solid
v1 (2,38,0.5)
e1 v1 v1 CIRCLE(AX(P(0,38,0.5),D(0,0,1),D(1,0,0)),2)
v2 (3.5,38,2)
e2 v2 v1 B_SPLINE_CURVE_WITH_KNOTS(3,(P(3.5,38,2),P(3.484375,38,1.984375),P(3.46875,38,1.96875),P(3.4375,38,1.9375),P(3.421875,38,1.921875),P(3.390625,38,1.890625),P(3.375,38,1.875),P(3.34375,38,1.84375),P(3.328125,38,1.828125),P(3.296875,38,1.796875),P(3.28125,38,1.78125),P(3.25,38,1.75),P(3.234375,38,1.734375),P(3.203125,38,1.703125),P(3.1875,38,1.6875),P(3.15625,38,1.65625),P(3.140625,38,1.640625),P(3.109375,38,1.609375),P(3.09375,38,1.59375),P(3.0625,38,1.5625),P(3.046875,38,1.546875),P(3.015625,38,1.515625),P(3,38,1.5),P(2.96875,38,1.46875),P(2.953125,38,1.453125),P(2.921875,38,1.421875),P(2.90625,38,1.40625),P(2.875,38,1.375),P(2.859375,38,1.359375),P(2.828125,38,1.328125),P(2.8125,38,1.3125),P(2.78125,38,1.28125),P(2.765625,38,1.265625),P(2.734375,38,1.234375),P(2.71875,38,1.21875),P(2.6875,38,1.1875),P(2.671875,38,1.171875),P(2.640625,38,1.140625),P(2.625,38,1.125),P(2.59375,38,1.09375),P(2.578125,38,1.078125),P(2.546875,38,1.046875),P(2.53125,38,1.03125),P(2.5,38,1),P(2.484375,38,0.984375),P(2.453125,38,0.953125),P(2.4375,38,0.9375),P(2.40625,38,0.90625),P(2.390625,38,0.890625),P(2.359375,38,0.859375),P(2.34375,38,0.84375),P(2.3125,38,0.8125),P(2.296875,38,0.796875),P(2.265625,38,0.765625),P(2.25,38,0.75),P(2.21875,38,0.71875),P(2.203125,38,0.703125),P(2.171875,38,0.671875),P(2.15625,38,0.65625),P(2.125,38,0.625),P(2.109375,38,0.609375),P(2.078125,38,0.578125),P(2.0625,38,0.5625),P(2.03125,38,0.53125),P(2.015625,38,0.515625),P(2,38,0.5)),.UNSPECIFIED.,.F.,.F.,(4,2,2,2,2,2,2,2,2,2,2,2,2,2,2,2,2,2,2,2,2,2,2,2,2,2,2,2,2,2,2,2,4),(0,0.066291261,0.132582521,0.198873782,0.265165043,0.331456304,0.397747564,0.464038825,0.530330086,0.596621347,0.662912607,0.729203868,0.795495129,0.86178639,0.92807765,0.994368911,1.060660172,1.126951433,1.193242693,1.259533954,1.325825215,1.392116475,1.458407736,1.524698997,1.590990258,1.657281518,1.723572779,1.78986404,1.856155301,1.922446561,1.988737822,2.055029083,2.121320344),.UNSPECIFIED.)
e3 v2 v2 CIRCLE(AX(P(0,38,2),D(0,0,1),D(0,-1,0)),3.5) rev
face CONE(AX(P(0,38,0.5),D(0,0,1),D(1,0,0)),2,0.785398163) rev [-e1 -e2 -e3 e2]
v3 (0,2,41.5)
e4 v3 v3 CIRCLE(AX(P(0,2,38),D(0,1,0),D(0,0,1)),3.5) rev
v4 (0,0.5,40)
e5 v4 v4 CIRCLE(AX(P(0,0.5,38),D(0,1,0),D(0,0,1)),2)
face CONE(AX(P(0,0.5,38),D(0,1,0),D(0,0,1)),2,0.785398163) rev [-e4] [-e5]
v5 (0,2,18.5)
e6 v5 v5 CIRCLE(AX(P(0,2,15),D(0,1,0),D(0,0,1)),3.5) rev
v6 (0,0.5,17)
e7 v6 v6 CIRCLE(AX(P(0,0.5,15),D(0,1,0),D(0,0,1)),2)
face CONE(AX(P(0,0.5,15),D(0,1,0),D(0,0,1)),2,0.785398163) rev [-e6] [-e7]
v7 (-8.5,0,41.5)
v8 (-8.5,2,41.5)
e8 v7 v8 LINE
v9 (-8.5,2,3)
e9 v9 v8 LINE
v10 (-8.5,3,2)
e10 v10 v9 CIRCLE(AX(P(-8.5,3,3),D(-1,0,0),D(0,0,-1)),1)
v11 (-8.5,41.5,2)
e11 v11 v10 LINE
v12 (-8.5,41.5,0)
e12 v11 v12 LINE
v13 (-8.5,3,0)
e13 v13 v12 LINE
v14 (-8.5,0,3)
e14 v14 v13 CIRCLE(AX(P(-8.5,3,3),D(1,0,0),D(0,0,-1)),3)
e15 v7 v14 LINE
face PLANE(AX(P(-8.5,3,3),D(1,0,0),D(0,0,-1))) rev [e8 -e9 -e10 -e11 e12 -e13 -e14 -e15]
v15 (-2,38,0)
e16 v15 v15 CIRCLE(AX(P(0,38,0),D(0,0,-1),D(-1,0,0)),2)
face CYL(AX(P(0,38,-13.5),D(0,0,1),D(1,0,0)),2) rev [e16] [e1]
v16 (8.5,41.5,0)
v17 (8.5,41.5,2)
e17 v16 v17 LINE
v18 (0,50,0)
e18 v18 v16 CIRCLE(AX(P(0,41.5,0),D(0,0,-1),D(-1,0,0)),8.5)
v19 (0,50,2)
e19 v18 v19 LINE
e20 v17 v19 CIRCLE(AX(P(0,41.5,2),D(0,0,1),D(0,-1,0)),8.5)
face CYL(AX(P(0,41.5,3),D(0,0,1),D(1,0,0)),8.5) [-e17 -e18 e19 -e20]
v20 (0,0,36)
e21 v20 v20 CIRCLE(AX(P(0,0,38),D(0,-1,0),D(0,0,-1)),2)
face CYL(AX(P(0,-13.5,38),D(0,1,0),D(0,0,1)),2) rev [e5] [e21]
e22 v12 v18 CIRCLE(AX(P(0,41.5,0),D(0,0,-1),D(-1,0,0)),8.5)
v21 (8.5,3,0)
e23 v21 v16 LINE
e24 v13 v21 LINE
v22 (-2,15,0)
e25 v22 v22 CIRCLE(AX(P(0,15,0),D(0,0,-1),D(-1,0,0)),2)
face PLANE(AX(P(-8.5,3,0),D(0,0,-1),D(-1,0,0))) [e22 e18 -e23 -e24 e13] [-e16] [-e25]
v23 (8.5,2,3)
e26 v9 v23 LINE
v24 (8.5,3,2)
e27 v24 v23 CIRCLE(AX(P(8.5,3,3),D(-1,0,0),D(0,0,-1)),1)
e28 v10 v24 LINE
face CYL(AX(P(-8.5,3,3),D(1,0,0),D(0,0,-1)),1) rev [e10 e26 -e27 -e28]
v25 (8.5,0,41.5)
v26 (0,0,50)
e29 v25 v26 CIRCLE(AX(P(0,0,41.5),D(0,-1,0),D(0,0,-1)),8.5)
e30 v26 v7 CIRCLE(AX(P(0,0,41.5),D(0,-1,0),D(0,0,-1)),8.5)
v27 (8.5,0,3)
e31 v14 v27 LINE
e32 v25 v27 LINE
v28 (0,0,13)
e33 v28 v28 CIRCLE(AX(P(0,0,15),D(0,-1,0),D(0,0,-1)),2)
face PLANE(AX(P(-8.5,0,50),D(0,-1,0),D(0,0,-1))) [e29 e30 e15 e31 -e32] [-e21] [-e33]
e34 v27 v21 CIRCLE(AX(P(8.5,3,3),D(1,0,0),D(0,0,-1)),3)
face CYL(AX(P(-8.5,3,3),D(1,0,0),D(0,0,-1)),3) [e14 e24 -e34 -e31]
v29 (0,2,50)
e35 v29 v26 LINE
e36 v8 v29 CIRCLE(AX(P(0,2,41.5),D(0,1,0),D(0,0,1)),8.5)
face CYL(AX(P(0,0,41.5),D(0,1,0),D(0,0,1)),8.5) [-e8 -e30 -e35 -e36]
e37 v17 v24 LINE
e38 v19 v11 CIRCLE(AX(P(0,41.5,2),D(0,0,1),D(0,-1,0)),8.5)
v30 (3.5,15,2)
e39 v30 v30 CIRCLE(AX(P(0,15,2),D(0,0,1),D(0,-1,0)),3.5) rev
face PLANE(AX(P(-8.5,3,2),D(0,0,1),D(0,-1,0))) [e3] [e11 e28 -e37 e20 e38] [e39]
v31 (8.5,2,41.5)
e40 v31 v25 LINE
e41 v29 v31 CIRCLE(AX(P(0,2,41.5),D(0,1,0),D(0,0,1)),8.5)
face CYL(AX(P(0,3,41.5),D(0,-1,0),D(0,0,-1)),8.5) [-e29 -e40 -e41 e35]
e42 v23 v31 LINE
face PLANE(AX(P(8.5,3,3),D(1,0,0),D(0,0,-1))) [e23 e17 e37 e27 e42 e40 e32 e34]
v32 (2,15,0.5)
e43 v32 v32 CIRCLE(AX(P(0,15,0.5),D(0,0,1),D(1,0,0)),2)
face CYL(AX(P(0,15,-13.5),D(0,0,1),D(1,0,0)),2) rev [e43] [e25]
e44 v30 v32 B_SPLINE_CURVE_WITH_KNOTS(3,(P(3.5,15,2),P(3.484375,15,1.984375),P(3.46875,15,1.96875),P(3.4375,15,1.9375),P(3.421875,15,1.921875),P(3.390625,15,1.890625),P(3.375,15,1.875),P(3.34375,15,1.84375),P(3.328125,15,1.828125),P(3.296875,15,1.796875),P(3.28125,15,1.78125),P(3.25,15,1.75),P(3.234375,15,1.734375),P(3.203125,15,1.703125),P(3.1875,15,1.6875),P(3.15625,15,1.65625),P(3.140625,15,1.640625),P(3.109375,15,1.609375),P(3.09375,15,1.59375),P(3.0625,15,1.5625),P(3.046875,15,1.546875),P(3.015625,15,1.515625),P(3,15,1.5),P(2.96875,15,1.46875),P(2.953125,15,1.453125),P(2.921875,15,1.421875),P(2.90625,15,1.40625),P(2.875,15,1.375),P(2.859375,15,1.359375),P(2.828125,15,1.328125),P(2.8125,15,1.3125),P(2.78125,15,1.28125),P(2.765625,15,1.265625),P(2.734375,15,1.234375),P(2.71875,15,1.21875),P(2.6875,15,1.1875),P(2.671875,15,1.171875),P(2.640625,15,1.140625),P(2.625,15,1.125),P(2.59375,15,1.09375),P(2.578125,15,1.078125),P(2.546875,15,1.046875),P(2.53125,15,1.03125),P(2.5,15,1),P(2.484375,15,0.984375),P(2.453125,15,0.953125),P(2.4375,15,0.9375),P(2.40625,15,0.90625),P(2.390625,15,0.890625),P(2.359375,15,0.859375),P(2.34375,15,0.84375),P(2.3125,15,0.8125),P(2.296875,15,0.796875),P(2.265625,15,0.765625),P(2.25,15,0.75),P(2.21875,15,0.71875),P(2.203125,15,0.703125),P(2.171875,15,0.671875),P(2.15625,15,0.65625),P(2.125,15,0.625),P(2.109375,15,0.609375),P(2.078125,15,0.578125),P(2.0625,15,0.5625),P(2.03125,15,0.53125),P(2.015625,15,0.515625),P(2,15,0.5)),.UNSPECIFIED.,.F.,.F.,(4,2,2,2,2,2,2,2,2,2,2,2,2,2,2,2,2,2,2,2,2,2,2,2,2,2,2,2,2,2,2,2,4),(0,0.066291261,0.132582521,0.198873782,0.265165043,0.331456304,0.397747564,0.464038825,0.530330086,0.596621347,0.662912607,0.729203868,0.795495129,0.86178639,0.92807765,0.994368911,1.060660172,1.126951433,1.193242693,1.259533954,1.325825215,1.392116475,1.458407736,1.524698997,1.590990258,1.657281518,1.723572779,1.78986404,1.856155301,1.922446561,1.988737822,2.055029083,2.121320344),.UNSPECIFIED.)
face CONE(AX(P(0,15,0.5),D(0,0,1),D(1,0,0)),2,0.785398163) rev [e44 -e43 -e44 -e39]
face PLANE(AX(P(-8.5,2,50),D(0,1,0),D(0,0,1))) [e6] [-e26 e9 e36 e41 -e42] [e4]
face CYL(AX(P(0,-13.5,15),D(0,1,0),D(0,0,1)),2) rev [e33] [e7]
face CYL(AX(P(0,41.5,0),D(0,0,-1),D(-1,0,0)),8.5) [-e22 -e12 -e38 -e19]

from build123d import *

# Parameters (mm, degrees)
EXTRUDE_1_DEPTH      = 8.5
EXTRUDE_1_DEPTH_BACK = 8.5
SKETCH_3_R           = 2
CUT_EXTRUDE_2_DEPTH  = 15.5
SKETCH_4_R           = 2
CUT_EXTRUDE_3_DEPTH  = 15.5
FILLET_1_R           = 8.5
CHAMFER_1_SIZE       = 1.5


with BuildPart() as part:
    # 草图1 → 凸台-拉伸1 (new, two sides: drawn at the far end of the back side and taken through both)
    with BuildSketch(Plane(origin=(0, 0, 0), x_dir=(0, 0, -1), z_dir=(1, 0, 0)).offset(-EXTRUDE_1_DEPTH_BACK)):
        with BuildLine():
            Line((-50, 0), (-3, 0))
            ThreePointArc((-3, 0), (-0.878679656, 0.878679656), (0, 3))
            Line((0, 3), (0, 50))
            Line((0, 50), (-2, 50))
            Line((-2, 50), (-2, 3))
            ThreePointArc((-2, 3), (-2.292893219, 2.292893219), (-3, 2))
            Line((-3, 2), (-50, 2))
            Line((-50, 2), (-50, 0))
        make_face()
    extrude(amount=EXTRUDE_1_DEPTH + EXTRUDE_1_DEPTH_BACK)

    # 草图3 → 切除-拉伸2 (cut)
    with BuildSketch(Plane(origin=(0, 2, 0), x_dir=(1, 0, 0), z_dir=(0, 1, 0))):
        with Locations(Location((0, -38, 0), (0, 0, 270))):
            Circle(SKETCH_3_R)
        with Locations(Location((0, -15, 0), (0, 0, 270))):
            Circle(SKETCH_3_R)
    extrude(amount=-CUT_EXTRUDE_2_DEPTH, mode=Mode.SUBTRACT)

    # 草图4 → 切除-拉伸3 (cut)
    with BuildSketch(Plane.XY.offset(2)):
        with Locations((0, 38)):
            Circle(SKETCH_4_R)
        with Locations((0, 15)):
            Circle(SKETCH_4_R)
    extrude(amount=-CUT_EXTRUDE_3_DEPTH, mode=Mode.SUBTRACT)

    # 圆角1
    fillet_1_edges = [part.edges().sort_by_distance(p)[0] for p in [
        (8.5, 50, 1),
        (-8.5, 50, 1),
        (8.5, 1, 50),
        (-8.5, 1, 50),
    ]]
    fillet(fillet_1_edges, radius=FILLET_1_R - 0.0001)  # a hair under: the kernel refuses the full size

    # 倒角1
    chamfer_1_edges = [part.edges().sort_by_distance(p)[0] for p in [
        (0, 2, 36),
        (0, 2, 13),
        (-2, 38, 2),
        (-2, 15, 2),
    ]]
    chamfer(chamfer_1_edges, length=CHAMFER_1_SIZE)


solid = part.part
